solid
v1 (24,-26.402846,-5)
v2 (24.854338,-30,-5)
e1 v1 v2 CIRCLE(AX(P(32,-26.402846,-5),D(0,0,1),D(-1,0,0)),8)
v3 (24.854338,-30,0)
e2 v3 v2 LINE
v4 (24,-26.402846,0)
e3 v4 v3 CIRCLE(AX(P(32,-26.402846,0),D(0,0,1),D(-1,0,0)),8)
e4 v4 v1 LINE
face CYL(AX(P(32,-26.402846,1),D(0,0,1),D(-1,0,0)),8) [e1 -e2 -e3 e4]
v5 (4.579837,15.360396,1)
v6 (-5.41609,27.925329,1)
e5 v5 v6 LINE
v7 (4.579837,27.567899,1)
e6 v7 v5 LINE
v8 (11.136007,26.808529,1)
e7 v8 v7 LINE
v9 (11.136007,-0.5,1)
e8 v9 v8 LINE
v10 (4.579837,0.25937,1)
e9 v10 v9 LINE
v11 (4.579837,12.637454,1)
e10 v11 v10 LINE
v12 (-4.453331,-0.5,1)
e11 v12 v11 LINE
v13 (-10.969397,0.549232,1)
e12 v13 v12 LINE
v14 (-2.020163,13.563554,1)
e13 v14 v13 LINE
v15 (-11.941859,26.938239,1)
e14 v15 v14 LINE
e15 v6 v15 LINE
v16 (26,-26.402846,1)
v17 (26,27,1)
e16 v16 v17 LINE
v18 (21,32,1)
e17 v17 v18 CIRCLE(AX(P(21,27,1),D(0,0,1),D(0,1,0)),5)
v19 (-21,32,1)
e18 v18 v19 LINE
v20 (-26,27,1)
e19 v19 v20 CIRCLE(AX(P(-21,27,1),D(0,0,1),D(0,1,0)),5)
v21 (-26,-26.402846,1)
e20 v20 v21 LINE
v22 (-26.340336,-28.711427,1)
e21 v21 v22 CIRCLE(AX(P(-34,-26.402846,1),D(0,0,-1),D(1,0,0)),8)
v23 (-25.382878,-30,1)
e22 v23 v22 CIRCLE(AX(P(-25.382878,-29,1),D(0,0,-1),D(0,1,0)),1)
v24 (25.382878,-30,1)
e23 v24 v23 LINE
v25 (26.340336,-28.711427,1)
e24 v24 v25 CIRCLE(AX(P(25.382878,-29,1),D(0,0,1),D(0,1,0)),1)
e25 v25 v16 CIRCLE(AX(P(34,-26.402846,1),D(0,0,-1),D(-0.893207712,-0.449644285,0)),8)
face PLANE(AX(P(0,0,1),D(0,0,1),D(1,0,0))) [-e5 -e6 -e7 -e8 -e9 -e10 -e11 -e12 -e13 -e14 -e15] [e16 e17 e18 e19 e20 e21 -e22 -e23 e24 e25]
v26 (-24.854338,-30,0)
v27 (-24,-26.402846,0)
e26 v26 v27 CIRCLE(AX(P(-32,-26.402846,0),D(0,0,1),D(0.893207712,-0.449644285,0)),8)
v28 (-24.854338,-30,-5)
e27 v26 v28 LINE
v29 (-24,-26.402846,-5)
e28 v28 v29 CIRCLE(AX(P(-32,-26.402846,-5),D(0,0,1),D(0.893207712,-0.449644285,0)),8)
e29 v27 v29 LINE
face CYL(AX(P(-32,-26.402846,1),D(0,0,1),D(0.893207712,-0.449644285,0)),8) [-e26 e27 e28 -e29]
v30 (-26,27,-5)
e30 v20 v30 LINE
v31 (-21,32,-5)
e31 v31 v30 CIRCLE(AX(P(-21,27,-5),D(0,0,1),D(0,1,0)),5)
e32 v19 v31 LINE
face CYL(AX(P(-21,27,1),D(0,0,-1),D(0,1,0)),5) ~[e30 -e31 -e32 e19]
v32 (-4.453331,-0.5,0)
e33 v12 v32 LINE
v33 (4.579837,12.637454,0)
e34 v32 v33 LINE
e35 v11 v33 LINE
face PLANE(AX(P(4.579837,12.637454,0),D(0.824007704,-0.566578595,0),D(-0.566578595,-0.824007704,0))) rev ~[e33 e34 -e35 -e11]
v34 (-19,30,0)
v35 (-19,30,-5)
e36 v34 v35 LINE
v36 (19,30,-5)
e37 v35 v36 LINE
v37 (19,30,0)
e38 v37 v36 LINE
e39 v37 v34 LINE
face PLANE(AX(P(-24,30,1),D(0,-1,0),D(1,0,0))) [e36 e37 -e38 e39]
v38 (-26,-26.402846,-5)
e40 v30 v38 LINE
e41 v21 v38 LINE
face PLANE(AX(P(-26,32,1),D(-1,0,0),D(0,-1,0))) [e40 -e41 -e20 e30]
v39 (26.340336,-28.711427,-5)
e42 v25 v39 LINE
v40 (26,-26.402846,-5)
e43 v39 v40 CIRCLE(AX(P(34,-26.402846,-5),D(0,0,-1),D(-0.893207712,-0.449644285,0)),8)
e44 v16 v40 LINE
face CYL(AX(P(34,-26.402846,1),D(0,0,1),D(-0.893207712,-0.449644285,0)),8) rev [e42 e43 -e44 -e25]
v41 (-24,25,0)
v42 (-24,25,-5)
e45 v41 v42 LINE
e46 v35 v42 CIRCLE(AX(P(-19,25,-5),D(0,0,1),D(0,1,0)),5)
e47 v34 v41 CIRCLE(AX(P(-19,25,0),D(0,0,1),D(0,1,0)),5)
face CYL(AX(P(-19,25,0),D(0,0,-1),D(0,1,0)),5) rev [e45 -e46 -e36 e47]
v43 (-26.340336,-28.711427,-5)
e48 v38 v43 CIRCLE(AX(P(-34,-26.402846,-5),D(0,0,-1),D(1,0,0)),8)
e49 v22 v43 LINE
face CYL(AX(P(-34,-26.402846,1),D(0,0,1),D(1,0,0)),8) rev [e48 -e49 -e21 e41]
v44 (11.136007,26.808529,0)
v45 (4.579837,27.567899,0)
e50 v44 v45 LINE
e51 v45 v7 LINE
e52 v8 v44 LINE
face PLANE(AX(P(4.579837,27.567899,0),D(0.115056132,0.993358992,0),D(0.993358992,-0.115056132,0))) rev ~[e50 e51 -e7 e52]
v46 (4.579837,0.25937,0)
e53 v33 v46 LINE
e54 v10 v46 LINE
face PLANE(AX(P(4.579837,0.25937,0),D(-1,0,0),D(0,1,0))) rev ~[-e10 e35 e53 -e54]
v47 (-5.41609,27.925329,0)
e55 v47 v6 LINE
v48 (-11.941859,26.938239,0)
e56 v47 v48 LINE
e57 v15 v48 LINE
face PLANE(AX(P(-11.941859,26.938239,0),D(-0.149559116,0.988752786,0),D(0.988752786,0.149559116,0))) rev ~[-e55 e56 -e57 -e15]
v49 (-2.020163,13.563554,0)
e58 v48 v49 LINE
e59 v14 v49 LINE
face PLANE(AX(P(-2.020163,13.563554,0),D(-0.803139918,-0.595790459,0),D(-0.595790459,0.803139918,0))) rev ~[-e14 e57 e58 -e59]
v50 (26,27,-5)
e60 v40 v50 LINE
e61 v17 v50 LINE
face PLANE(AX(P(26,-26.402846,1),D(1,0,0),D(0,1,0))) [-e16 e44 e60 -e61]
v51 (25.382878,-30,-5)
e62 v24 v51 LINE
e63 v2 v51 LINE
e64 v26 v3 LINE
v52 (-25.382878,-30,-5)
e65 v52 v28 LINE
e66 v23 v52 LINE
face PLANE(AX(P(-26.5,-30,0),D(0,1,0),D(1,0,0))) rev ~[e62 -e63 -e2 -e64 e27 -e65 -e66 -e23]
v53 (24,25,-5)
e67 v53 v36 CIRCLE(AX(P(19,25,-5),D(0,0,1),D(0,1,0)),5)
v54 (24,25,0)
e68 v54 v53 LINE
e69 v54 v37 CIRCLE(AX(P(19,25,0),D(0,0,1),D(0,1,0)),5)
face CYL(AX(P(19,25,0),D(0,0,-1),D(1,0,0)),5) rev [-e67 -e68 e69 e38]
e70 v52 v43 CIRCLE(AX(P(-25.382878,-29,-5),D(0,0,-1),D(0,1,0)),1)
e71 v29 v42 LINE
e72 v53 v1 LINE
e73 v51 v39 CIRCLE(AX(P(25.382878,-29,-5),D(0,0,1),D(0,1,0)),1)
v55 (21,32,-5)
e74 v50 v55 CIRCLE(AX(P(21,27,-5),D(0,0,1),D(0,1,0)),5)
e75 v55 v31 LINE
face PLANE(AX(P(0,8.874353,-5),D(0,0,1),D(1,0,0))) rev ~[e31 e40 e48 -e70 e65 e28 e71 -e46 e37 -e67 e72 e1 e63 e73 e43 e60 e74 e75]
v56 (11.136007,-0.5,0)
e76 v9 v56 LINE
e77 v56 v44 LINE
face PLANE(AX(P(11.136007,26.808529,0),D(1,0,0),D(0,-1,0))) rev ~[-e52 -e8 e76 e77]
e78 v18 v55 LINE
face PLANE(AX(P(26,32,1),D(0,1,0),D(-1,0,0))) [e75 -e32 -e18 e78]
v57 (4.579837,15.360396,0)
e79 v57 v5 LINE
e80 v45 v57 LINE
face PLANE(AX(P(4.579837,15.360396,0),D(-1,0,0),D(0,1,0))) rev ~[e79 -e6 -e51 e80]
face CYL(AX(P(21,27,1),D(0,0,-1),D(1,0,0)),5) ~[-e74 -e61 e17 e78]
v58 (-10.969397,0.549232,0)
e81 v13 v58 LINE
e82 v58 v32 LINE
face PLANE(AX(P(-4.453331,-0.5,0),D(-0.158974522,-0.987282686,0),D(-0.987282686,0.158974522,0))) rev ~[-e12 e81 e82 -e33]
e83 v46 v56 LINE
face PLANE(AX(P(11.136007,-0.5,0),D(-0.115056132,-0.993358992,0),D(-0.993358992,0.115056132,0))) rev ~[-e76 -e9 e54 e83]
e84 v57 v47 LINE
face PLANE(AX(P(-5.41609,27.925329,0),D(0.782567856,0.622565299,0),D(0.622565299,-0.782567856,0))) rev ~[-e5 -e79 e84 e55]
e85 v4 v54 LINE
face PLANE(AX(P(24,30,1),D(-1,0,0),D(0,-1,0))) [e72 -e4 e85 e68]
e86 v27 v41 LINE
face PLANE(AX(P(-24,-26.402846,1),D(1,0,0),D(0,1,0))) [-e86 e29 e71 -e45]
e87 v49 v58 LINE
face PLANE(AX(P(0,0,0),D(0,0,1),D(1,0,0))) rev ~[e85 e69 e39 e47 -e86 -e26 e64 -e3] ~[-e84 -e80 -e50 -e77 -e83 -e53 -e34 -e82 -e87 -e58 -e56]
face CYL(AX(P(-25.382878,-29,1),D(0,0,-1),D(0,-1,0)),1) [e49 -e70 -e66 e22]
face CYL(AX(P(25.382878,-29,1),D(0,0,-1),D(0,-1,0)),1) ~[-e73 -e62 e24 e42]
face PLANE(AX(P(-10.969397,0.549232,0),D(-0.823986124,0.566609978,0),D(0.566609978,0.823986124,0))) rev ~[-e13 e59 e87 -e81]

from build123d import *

# Parameters (mm, degrees)
F1_DEPTH = 1
F3_DEPTH = 6
F4_R     = 1
F5_R     = 5
F7_DEPTH = 12.5
F8_SCALE = 1.2


# Not quite as in the source:
# - a feature names something its author has since deleted; it is built from what else it names


with BuildPart() as f1:
    # F0 (on Top) → F1 (new body)
    with BuildSketch(Plane.XY):
        Polygon((24, 30), (-24, 30), (-24, -20.3061967343), (-24, -30), (24, -30), (24, -20.3061967343), align=None)
        Polygon((-24, -30), (-24, -20.3061967343), (-26.5, -30), align=None)
        Polygon((26.5, -30), (24, -20.3061967343), (24, -30), align=None)
    extrude(amount=F1_DEPTH)

    # F2 (on face) → F3 (join)
    with BuildSketch(Plane.XY.offset(1)):
        with BuildLine():
            Line((24, 30), (24, -26.4028457212))
            ThreePointArc((24, -26.4028457212), (24.2165144832, -28.2514541736), (24.8543383025, -30))
            Line((24.8543383025, -30), (26.8543383025, -30))
            ThreePointArc((26.8543383025, -30), (26.2165144832, -28.2514541736), (26, -26.4028457212))
            Line((26, -26.4028457212), (26, 32))
            Line((26, 32), (0, 32))
            Line((0, 32), (-26, 32))
            Line((-26, 32), (-26, -26.4028457212))
            ThreePointArc((-26, -26.4028457212), (-26.2165144832, -28.2514541736), (-26.8543383025, -30))
            Line((-26.8543383025, -30), (-24.8543383025, -30))
            ThreePointArc((-24.8543383025, -30), (-24.2165144832, -28.2514541736), (-24, -26.4028457212))
            Line((-24, -26.4028457212), (-24, 30))
            Line((-24, 30), (0, 30))
            Line((0, 30), (24, 30))
        make_face()
    extrude(amount=-F3_DEPTH)

    # F4
    f4_edges = [f1.edges().sort_by_distance(p)[0] for p in [
        (-26.854338, -30, -2),
        (26.854338, -30, -2),
    ]]
    fillet(f4_edges, radius=F4_R)

    # F5
    f5_edges = [f1.edges().sort_by_distance(p)[0] for p in [
        (24, 30, -2.5),
        (26, 32, -2),
        (-26, 32, -2),
        (-24, 30, -2.5),
    ]]
    fillet(f5_edges, radius=F5_R)


with BuildPart() as f7:
    # F6 (on face) → F7 (new body, symmetric)
    with BuildSketch(Plane(origin=(0, 0, 0), x_dir=(1, 0, 0), z_dir=(0, 0, -1))):
        Polygon((6.3998643309, -23.389915917), (11.8633387856, -22.7571071915), (11.8633387856, 0), (6.3998643309, -0.6328087254), (6.3998643309, -10.9478783381), (6.3998643309, -13.2169965655), align=None)
        Polygon((-1.9300751453, -23.6877743155), (6.3998643309, -13.2169965655), (6.3998643309, -10.9478783381), (-1.1277758749, 0), (-6.5578306463, -0.8743598687), (0.8998643309, -11.7196280624), (-7.3682154656, -22.865199178), align=None)
    extrude(amount=F7_DEPTH, both=True)


with BuildPart() as f7_1:
    # F8: moved
    add(f7.part.scale(F8_SCALE))


with BuildPart() as f7_2:
    # F9: moved
    add(f7_1.part.moved(Location((-3.1, -0.5, 0))))


with BuildPart() as f1_1:
    add(f1.part)

    # F10: cut F7
    add(f7_2.part, mode=Mode.SUBTRACT)


solid = f1_1.part
